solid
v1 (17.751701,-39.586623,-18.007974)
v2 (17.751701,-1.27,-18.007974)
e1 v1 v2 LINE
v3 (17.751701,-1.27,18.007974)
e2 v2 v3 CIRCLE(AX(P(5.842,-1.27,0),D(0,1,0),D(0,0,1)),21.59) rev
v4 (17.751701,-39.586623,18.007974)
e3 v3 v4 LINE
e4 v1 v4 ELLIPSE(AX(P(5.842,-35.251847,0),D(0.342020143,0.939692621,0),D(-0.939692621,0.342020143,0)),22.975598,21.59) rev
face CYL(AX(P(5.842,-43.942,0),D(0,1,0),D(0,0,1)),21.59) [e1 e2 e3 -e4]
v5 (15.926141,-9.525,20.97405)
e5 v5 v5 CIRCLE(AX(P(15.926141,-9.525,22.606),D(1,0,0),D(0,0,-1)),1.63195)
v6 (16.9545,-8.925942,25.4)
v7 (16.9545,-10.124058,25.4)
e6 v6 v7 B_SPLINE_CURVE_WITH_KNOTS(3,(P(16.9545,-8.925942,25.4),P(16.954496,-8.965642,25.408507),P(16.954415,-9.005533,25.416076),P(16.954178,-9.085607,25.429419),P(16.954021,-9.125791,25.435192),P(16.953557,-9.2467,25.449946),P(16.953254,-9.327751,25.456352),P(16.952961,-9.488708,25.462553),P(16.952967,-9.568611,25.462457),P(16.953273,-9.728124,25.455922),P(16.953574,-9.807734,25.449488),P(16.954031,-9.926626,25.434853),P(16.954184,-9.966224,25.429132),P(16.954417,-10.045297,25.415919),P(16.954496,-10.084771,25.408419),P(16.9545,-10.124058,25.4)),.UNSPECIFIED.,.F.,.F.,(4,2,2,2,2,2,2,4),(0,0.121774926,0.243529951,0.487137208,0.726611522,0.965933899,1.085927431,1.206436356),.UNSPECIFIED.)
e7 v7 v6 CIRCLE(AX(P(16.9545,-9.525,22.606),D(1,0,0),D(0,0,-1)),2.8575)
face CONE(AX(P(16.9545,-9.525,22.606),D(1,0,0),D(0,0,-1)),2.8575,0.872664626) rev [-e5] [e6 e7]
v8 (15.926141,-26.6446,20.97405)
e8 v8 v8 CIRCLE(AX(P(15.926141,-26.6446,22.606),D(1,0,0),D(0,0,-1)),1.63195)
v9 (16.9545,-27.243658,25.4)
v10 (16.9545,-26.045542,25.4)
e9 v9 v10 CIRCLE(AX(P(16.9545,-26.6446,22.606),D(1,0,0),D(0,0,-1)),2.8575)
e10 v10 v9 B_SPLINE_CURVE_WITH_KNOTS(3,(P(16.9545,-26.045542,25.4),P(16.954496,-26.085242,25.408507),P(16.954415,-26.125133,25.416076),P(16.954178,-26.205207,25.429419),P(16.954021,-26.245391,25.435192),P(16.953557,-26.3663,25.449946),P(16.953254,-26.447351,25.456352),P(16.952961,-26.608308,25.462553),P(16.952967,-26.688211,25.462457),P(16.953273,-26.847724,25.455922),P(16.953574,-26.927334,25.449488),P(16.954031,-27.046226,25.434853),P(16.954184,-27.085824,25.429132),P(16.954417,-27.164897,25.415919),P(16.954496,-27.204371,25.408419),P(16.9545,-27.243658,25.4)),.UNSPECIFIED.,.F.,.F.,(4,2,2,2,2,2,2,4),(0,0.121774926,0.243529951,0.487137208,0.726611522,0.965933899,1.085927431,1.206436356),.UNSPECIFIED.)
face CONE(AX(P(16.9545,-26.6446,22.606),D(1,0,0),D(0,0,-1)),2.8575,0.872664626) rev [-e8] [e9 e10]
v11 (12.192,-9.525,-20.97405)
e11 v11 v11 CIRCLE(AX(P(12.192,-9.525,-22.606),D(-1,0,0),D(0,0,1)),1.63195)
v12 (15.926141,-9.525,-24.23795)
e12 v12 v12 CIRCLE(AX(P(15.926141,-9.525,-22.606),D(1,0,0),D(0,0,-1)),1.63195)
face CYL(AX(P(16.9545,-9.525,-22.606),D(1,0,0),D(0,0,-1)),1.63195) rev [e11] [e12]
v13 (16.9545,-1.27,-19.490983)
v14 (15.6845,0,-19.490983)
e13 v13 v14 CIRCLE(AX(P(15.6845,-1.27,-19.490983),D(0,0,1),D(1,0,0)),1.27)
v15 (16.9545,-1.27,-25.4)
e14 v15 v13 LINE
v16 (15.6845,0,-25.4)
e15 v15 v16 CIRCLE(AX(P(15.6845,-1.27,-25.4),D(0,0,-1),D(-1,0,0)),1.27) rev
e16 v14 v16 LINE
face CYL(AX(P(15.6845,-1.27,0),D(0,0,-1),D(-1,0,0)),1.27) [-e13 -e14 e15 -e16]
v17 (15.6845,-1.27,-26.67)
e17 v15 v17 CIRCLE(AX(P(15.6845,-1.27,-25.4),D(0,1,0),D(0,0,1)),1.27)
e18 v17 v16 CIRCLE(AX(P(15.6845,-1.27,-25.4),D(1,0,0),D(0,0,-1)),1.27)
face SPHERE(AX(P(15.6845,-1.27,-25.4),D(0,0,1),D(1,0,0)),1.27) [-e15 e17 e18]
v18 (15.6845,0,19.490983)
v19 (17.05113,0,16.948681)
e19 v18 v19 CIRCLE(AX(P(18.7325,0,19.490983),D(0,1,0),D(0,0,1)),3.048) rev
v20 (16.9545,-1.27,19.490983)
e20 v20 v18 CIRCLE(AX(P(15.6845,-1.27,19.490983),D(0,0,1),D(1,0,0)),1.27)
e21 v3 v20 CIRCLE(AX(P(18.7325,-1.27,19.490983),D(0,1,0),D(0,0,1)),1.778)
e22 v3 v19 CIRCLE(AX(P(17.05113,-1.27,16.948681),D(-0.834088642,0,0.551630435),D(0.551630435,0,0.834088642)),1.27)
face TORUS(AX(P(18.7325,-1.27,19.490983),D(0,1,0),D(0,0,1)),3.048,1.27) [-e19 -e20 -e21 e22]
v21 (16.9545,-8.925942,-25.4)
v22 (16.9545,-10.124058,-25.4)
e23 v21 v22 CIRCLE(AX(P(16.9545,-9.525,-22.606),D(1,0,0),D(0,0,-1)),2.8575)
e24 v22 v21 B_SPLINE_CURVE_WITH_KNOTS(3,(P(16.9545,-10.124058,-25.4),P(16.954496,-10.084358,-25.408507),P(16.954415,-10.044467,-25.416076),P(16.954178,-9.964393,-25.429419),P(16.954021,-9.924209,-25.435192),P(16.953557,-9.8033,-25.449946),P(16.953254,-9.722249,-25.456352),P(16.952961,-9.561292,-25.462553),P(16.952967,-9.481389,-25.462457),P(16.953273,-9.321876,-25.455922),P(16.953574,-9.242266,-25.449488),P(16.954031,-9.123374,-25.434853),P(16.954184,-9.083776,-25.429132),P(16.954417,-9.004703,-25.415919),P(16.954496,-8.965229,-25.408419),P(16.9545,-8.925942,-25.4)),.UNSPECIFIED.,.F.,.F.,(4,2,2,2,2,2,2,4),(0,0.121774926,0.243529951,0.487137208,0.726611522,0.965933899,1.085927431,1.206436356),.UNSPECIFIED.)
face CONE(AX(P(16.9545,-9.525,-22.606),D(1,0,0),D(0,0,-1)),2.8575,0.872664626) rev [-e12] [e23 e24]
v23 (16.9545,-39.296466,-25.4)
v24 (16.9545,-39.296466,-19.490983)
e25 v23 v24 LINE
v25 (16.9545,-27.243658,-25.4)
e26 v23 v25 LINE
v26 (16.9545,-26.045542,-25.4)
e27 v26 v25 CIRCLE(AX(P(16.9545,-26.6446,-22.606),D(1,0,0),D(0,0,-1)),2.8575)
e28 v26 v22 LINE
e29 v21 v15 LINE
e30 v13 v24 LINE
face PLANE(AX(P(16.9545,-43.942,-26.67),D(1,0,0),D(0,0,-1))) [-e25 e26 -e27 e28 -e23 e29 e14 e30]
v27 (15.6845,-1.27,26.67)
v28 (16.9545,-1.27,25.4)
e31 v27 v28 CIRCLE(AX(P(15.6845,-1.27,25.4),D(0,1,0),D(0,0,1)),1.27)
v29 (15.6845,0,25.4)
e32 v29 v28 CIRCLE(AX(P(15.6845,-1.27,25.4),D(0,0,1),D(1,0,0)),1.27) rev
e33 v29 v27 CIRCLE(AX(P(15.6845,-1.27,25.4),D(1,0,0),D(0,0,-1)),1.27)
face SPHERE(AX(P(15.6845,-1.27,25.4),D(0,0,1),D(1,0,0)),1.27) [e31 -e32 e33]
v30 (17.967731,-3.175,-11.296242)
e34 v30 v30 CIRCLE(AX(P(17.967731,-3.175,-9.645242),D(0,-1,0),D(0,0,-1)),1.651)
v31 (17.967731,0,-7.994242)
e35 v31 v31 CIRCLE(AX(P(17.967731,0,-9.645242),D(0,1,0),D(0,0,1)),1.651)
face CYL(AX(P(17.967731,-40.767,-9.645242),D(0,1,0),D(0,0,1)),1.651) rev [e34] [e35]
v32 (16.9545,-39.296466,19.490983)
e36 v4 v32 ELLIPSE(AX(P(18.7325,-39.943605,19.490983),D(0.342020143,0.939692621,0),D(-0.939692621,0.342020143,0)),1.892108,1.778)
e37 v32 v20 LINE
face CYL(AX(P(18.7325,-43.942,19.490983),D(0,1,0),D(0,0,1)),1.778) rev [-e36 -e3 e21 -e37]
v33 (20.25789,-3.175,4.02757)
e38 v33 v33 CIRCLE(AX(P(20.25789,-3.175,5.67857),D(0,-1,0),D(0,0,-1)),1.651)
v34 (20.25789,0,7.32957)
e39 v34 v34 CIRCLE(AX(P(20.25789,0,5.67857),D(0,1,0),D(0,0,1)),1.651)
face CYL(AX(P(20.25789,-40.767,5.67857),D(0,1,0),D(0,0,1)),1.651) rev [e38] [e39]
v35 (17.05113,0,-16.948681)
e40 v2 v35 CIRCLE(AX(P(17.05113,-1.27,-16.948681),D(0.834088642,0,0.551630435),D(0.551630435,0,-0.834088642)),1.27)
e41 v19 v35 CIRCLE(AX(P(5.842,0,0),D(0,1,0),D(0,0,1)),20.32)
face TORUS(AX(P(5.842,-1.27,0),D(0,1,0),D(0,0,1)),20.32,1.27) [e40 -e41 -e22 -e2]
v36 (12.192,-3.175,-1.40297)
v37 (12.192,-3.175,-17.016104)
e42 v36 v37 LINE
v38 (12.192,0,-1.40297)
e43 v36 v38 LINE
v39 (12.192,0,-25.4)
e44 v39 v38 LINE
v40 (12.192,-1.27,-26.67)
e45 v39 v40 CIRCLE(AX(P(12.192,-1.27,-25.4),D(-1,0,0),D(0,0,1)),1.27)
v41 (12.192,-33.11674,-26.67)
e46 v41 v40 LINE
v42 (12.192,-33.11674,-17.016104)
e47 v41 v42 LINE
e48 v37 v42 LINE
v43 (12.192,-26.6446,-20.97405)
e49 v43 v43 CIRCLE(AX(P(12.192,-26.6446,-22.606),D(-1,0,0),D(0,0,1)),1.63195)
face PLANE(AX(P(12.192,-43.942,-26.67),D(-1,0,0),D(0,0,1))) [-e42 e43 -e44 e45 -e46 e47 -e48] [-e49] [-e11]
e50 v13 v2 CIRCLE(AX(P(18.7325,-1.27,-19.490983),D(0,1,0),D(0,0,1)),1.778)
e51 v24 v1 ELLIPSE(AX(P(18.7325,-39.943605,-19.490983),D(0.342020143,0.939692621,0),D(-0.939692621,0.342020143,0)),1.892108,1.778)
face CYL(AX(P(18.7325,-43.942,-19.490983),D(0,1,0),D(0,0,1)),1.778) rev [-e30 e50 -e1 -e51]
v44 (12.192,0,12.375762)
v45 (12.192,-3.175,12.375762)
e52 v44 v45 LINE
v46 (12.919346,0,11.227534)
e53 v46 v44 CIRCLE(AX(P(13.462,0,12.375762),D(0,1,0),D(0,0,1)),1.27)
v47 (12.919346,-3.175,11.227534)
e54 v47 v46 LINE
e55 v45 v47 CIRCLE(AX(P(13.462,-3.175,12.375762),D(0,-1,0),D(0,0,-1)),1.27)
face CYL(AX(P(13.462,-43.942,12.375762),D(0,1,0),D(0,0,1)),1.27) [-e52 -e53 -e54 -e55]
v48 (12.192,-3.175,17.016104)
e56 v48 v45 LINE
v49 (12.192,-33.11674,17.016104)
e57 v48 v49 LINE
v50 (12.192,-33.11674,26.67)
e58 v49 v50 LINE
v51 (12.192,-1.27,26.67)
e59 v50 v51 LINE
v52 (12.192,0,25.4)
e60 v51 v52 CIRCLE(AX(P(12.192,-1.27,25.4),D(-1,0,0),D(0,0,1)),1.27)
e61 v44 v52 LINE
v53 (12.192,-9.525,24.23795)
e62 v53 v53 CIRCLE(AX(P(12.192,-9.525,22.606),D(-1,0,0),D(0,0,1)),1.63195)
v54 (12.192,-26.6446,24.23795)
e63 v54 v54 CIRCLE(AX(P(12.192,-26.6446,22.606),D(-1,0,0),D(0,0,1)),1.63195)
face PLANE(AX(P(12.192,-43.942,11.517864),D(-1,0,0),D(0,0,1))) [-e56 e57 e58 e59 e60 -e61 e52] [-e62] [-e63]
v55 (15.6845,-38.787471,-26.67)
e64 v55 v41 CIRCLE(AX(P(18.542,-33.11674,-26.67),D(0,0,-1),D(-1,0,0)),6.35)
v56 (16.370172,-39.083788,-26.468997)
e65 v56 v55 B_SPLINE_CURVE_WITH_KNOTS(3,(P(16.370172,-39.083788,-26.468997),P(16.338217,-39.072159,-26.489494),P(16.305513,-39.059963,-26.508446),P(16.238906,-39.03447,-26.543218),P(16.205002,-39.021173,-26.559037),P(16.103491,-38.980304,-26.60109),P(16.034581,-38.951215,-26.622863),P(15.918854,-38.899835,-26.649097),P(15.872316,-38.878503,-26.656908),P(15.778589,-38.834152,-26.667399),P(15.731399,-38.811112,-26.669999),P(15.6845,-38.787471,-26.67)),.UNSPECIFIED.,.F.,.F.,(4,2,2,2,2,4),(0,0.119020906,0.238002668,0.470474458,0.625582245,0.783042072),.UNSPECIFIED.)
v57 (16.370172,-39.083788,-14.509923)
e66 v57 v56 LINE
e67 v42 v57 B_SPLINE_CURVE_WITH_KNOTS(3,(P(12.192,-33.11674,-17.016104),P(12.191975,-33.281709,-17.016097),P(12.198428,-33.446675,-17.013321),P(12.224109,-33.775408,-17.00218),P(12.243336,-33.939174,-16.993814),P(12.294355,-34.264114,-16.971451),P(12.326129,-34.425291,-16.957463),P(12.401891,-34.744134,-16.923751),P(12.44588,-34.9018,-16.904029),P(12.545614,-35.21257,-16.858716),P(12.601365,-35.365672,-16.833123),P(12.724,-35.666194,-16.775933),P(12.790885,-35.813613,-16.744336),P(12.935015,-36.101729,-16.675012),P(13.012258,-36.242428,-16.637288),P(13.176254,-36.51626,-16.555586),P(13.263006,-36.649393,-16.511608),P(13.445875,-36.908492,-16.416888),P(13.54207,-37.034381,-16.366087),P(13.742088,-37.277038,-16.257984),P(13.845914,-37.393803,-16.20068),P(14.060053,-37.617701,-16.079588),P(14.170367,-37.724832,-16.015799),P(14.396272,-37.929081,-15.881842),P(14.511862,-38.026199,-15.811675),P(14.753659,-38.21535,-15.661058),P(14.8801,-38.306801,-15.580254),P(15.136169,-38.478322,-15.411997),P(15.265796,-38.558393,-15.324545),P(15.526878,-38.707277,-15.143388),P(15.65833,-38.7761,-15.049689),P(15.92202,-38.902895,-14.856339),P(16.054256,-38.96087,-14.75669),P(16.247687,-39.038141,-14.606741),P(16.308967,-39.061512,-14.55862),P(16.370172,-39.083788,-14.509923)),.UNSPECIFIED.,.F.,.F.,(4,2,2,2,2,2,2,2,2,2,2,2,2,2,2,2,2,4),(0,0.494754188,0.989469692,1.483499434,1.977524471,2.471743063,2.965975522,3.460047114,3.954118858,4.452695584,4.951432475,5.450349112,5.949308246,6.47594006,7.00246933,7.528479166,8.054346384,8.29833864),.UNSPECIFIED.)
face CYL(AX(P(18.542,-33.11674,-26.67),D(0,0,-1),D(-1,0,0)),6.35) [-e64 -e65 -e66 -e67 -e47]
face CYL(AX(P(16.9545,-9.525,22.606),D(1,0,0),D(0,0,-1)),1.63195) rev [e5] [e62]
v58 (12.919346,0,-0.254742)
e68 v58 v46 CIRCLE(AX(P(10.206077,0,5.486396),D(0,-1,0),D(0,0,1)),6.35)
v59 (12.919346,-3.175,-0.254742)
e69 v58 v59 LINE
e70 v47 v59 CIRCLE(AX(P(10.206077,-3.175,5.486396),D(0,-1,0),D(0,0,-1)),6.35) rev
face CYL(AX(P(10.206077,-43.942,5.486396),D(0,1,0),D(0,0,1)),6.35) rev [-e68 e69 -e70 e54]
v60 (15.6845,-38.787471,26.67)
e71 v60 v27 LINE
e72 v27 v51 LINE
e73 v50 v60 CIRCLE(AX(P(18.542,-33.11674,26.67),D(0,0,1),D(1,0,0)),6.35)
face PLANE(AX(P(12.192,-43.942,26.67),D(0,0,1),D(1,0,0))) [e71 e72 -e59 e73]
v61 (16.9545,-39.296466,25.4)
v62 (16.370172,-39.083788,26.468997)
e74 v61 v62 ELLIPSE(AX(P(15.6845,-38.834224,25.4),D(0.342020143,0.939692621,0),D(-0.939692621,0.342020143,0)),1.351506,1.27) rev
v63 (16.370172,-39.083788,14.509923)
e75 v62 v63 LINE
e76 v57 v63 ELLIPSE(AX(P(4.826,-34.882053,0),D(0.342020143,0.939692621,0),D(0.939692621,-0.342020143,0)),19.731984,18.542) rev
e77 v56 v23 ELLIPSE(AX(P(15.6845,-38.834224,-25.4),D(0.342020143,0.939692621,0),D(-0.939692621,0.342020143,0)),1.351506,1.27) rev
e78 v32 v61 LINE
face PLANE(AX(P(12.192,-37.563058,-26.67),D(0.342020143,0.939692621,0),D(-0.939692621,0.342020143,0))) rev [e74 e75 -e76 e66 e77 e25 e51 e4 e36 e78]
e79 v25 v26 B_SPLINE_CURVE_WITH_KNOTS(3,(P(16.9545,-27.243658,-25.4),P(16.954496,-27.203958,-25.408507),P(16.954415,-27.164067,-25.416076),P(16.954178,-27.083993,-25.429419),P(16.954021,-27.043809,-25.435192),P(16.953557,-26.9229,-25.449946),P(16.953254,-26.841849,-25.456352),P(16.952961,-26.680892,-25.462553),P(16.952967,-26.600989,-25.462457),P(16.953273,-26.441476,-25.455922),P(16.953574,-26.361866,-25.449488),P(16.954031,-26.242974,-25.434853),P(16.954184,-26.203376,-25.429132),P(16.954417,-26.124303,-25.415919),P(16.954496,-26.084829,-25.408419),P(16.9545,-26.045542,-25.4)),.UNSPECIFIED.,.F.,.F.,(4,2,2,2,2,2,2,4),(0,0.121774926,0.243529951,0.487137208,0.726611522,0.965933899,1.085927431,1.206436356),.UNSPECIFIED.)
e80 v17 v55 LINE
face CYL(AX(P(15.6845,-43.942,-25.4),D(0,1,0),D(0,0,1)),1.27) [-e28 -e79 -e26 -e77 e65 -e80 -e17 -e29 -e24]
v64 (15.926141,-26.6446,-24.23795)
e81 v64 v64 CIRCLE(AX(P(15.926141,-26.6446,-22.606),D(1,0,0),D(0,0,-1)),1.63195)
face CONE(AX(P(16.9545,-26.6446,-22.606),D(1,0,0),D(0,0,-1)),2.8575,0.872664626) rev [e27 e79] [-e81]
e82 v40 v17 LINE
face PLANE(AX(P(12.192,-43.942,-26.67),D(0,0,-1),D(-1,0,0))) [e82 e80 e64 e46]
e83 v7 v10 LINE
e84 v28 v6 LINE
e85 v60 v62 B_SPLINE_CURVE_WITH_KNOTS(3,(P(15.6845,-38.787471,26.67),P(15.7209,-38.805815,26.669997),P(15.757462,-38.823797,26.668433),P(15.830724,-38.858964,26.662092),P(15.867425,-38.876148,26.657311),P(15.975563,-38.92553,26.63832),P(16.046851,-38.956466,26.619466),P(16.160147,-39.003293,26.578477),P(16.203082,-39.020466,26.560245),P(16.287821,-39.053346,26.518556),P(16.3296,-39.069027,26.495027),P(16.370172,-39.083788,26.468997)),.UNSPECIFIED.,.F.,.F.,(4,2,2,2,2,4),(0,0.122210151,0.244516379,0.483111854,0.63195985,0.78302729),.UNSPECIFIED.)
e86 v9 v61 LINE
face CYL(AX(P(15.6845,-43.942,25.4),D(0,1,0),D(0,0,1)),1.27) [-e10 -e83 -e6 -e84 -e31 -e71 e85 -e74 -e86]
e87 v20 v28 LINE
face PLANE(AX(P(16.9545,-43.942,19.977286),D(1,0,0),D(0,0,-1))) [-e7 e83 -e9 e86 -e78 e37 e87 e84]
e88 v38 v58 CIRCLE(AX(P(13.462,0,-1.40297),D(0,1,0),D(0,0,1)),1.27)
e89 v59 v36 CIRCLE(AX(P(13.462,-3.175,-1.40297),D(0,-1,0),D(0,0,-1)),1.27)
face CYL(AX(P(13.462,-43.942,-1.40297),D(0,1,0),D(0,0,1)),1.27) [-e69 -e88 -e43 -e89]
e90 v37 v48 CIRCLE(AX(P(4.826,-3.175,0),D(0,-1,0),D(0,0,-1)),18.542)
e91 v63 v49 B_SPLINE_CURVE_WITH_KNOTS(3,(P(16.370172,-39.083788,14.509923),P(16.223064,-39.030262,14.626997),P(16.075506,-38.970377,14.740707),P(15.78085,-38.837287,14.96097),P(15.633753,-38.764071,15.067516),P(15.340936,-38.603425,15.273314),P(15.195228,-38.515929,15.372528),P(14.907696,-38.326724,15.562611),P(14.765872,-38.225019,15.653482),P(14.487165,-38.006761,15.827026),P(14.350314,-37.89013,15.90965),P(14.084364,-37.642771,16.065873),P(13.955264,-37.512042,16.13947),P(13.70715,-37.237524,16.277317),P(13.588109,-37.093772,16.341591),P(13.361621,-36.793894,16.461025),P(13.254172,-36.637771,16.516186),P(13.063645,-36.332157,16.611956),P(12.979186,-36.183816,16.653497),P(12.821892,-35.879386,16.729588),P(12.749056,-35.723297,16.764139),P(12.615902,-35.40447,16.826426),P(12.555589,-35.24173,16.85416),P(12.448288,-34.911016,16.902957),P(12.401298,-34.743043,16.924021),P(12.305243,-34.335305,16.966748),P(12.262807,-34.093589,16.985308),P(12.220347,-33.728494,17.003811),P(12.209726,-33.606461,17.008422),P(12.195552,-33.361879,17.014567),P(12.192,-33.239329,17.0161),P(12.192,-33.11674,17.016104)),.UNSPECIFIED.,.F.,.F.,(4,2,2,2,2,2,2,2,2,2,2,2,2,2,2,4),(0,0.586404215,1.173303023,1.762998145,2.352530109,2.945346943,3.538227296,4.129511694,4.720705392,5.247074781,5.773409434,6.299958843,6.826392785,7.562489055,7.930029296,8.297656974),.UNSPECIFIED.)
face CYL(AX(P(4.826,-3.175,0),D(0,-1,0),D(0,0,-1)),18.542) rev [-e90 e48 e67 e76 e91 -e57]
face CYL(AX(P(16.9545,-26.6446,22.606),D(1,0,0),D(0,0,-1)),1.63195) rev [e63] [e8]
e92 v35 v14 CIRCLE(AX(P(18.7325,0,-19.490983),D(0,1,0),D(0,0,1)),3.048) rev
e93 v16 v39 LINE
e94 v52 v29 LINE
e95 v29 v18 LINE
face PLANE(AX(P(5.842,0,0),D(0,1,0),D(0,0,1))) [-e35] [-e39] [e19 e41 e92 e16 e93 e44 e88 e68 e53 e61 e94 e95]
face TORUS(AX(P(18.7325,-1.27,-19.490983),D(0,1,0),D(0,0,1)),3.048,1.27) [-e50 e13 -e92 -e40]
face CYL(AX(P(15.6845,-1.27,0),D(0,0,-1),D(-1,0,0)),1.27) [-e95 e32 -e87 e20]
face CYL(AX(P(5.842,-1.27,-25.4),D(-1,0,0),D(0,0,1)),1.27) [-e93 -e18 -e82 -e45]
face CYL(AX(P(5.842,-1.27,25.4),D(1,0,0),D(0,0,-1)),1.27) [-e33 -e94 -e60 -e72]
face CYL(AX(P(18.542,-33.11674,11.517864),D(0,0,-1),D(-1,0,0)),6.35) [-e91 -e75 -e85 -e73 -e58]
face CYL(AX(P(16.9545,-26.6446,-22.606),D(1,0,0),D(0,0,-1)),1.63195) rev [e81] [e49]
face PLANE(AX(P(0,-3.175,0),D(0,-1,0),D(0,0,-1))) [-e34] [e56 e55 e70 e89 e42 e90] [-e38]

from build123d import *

# Parameters (mm, degrees)
BOSS_EXTRUDE1_DEPTH                       = 43.942
CUT_EXTRUDE1_START                        = -40.767
CUT_EXTRUDE1_DEPTH                        = 40.767
FILLET1_R                                 = 1.27
CSK_FOR_4_FLAT_HEAD_MACHINE_SCREW_2_COUNT = 2
CSK_FOR_4_FLAT_HEAD_MACHINE_SCREW_2_PITCH = 17.1196
CUT_EXTRUDE2_DEPTH                        = 75.354351507
FILLET3_R                                 = 1.778
FILLET4_R                                 = 1.27
FILLET5_R                                 = 6.35
SKETCH8_R                                 = 1.651
CUT_EXTRUDE3_DEPTH                        = 40.767


with BuildPart() as part:
    # Sketch1 → Boss-Extrude1 (new body)
    with BuildSketch(Plane(origin=(0, 0, 0), x_dir=(1, 0, 0), z_dir=(0, 1, 0))):
        with BuildLine():
            Line((12.192, 26.67), (12.192, 0.545071947))
            ThreePointArc((12.192, 0.545071947), (16.556076609, -5.486396223), (12.192, -11.517864393))
            Line((12.192, -11.517864393), (12.192, -26.67))
            Line((12.192, -26.67), (16.9545, -26.67))
            Line((16.9545, -26.67), (16.9545, -19.977285695))
            Line((16.9545, -19.977285695), (16.9545, -18.510549526))
            ThreePointArc((16.9545, -18.510549526), (27.432, 0), (16.9545, 18.510549526))
            Line((16.9545, 18.510549526), (16.9545, 19.977285695))
            Line((16.9545, 19.977285695), (16.9545, 26.67))
            Line((16.9545, 26.67), (12.192, 26.67))
        make_face()
    extrude(amount=-BOSS_EXTRUDE1_DEPTH)

    # Sketch3 → Cut-Extrude1 (cut)
    with BuildSketch(Plane.XZ.offset(43.942).offset(CUT_EXTRUDE1_START)):
        with BuildLine():
            ThreePointArc((12.192, -17.016104372), (23.368, 0), (12.192, 17.016104372))
            Line((12.192, 17.016104372), (12.192, 11.517864393))
            ThreePointArc((12.192, 11.517864393), (16.556076609, 5.486396223), (12.192, -0.545071947))
            Line((12.192, -0.545071947), (12.192, -17.016104372))
        make_face()
    extrude(amount=CUT_EXTRUDE1_DEPTH, mode=Mode.SUBTRACT)

    # Fillet1
    fillet1_edges = [part.edges().sort_by_distance(p)[0] for p in [
        (12.192, -1.5875, -0.545071947),
        (12.192, -1.5875, 11.517864393),
    ]]
    fillet(fillet1_edges, radius=FILLET1_R)

    # Sketch6 → CSK for #4 Flat Head Machine Screw (100)1 (revolve, cut)
    with BuildSketch(Plane(origin=(16.9545, -9.525, 22.606), x_dir=(0, 0, -1), z_dir=(0, 1, 0))):
        Polygon((0, 0), (0, 7.838574487), (1.63195, 6.858), (1.63195, 1.028358553), (2.8575, 0), align=None)
    csk_for_4_flat_head_machine_screw_100 = revolve(axis=Axis((23.3045, -9.525, 22.606), (-1, 0, 0)), mode=Mode.SUBTRACT)

    # CSK for _4 Flat Head Machine Screw _ 2: CSK for #4 Flat Head Machine Screw (100)1 ×2
    with Locations(*[(0, -i * CSK_FOR_4_FLAT_HEAD_MACHINE_SCREW_2_PITCH, 0) for i in range(1, CSK_FOR_4_FLAT_HEAD_MACHINE_SCREW_2_COUNT)]):
        add(csk_for_4_flat_head_machine_screw_100, mode=Mode.SUBTRACT)

    # Mirror1: CSK for #4 Flat Head Machine Screw (100)1 across plane
    add(csk_for_4_flat_head_machine_screw_100.mirror(Plane.XY), mode=Mode.SUBTRACT)

    # Mirror1 copy 1 sketch → Mirror1 copy 1 (revolve, cut)
    with BuildSketch(Plane(origin=(16.9545, -26.6446, -22.606), x_dir=(0, 0, 1), z_dir=(0, 1, 0))):
        Polygon((0, 0), (0, -7.838574487), (1.63195, -6.858), (1.63195, -1.028358553), (2.8575, 0), align=None)
    revolve(axis=Axis((23.3045, -26.6446, -22.606), (1, 0, 0)), mode=Mode.SUBTRACT)

    # Sketch7 → Cut-Extrude2 (cut, through all)
    with BuildSketch(Plane.XY.offset(26.67)):
        Polygon((12.192, -37.563057674), (29.718, -43.942), (12.192, -43.942), align=None)
    extrude(amount=-CUT_EXTRUDE2_DEPTH, mode=Mode.SUBTRACT)

    # Fillet3
    fillet3_edges = [part.edges().sort_by_distance(p)[0] for p in [
        (16.9545, -19.648232957, -18.510549526),
        (16.9545, -19.648232957, 18.510549526),
    ]]
    fillet(fillet3_edges, radius=FILLET3_R)

    # Fillet4
    # the kernel refuses this fillet: 1.27 mm, written as the material it takes off along each edge
    with BuildSketch(Plane(origin=(15.6845, -1.27, -25.4), x_dir=(0, 0, -1), z_dir=(1, 0, 0))) as fillet4_piece_1_section:
        Polygon((0, 0), (FILLET4_R, 0), (FILLET4_R, FILLET4_R), (0, FILLET4_R), align=None)
    fillet4_piece_1 = extrude(amount=FILLET4_R, mode=Mode.PRIVATE)
    fillet4_piece_1 = fillet4_piece_1 - Plane(origin=(15.6845, -1.27, -25.4), x_dir=(0, -0.7071067811865475, 0.7071067811865475), z_dir=(1, 0, 0)) * Sphere(FILLET4_R, mode=Mode.PRIVATE)
    add(fillet4_piece_1, mode=Mode.SUBTRACT)
    with BuildSketch(Plane(origin=(15.6845, -1.27, 25.4), x_dir=(1, 0, 0), z_dir=(0, 0, 1))) as fillet4_piece_2_section:
        Polygon((0, 0), (FILLET4_R, 0), (FILLET4_R, FILLET4_R), (0, FILLET4_R), align=None)
    fillet4_piece_2 = extrude(amount=FILLET4_R, mode=Mode.PRIVATE)
    fillet4_piece_2 = fillet4_piece_2 - Plane(origin=(15.6845, -1.27, 25.4), x_dir=(-0.7071067811865475, -0.7071067811865475, 0), z_dir=(0, 0, 1)) * Sphere(FILLET4_R, mode=Mode.PRIVATE)
    add(fillet4_piece_2, mode=Mode.SUBTRACT)
    with BuildSketch(Plane(origin=(15.6845, 0, -26.67), x_dir=(0, -1, 0), z_dir=(-1, 0, 0)), Plane(origin=(9.017, 0, 26.67), x_dir=(0, -1, 0), z_dir=(1, 0, 0))) as fillet4_piece_3:
        with BuildLine():
            CenterArc((FILLET4_R, FILLET4_R), FILLET4_R, 180, 90)
            Line((0, FILLET4_R), (0, 0))
            Line((0, 0), (FILLET4_R, 0))
        make_face()
    extrude(amount=6.6675, mode=Mode.SUBTRACT)
    with BuildSketch(Plane(origin=(5.842, 0, 0), x_dir=(0.5516304347826092, 0, 0.8340886424245023), z_dir=(-0.8340886424245023, 0, 0.5516304347826092))) as fillet4_piece_4:
        with BuildLine():
            CenterArc((21.59 - FILLET4_R, -FILLET4_R), FILLET4_R, 0, 90)
            Line((21.59 - FILLET4_R, 0), (21.59, 0))
            Line((21.59, 0), (21.59, -FILLET4_R))
        make_face()
    revolve(axis=Axis((5.842, 0, 0), (0, 1, 0)), revolution_arc=113.042120672, mode=Mode.SUBTRACT)
    with BuildSketch(Plane(origin=(16.9545, 0, -25.4), x_dir=(0, -1, 0), z_dir=(0, 0, 1)), Plane(origin=(16.9545, 0, 19.490983396), x_dir=(0, -1, 0), z_dir=(0, 0, 1))) as fillet4_piece_5:
        with BuildLine():
            CenterArc((FILLET4_R, -FILLET4_R), FILLET4_R, 90, 90)
            Line((0, -FILLET4_R), (0, 0))
            Line((0, 0), (FILLET4_R, 0))
        make_face()
    extrude(amount=5.909016604, mode=Mode.SUBTRACT)
    with BuildSketch(Plane(origin=(18.7325, 0, -19.490983396), x_dir=(-0.5516304347826076, 0, 0.8340886424245035), z_dir=(0.8340886424245035, 0, 0.5516304347826076))) as fillet4_piece_6:
        with BuildLine():
            CenterArc((1.778 + FILLET4_R, FILLET4_R), FILLET4_R, 180, 90)
            Line((1.778 + FILLET4_R, 0), (1.778, 0))
            Line((1.778, 0), (1.778, FILLET4_R))
        make_face()
    revolve(axis=Axis((18.7325, 0, -19.490983396), (0, -1, 0)), revolution_arc=56.521060336, mode=Mode.SUBTRACT)
    with BuildSketch(Plane(origin=(18.7325, 0, 19.490983396), x_dir=(-1, 0, 0), z_dir=(0, 0, 1))) as fillet4_piece_7:
        with BuildLine():
            CenterArc((1.778 + FILLET4_R, FILLET4_R), FILLET4_R, 180, 90)
            Line((1.778 + FILLET4_R, 0), (1.778, 0))
            Line((1.778, 0), (1.778, FILLET4_R))
        make_face()
    revolve(axis=Axis((18.7325, 0, 19.490983396), (0, -1, 0)), revolution_arc=56.521060336, mode=Mode.SUBTRACT)
    with BuildSketch(Plane(origin=(16.9545, -1.27, 26.67), x_dir=(0, 0, -1), z_dir=(0, -1, 0))) as fillet4_piece_8:
        with BuildLine():
            CenterArc((FILLET4_R, -FILLET4_R), FILLET4_R, 90, 90)
            Line((0, -FILLET4_R), (0, 0))
            Line((0, 0), (FILLET4_R, 0))
        make_face()
    extrude(amount=41.201465915, mode=Mode.SUBTRACT)
    with BuildSketch(Plane(origin=(16.9545, -1.27, -26.67), x_dir=(0, 0, 1), z_dir=(0, -1, 0))) as fillet4_piece_9:
        with BuildLine():
            CenterArc((FILLET4_R, FILLET4_R), FILLET4_R, 180, 90)
            Line((0, FILLET4_R), (0, 0))
            Line((0, 0), (FILLET4_R, 0))
        make_face()
    extrude(amount=41.201465915, mode=Mode.SUBTRACT)

    # Fillet5
    fillet5_edges = [part.edges().sort_by_distance(p)[0] for p in [
        (12.192, -37.563057674, -21.843052186),
        (12.192, -37.563057674, 21.843052186),
    ]]
    fillet(fillet5_edges, radius=FILLET5_R)

    # Sketch8 → Cut-Extrude3 (cut)
    with BuildSketch(Plane(origin=(0, 0, 0), x_dir=(1, 0, 0), z_dir=(0, 1, 0))):
        with Locations(Location((17.967730782, 9.64524178, 0), (0, 0, 270))):
            Circle(SKETCH8_R)
        with Locations(Location((20.257889798, -5.678570007, 0), (0, 0, 270))):
            Circle(SKETCH8_R)
    extrude(amount=-CUT_EXTRUDE3_DEPTH, mode=Mode.SUBTRACT)


solid = part.part
